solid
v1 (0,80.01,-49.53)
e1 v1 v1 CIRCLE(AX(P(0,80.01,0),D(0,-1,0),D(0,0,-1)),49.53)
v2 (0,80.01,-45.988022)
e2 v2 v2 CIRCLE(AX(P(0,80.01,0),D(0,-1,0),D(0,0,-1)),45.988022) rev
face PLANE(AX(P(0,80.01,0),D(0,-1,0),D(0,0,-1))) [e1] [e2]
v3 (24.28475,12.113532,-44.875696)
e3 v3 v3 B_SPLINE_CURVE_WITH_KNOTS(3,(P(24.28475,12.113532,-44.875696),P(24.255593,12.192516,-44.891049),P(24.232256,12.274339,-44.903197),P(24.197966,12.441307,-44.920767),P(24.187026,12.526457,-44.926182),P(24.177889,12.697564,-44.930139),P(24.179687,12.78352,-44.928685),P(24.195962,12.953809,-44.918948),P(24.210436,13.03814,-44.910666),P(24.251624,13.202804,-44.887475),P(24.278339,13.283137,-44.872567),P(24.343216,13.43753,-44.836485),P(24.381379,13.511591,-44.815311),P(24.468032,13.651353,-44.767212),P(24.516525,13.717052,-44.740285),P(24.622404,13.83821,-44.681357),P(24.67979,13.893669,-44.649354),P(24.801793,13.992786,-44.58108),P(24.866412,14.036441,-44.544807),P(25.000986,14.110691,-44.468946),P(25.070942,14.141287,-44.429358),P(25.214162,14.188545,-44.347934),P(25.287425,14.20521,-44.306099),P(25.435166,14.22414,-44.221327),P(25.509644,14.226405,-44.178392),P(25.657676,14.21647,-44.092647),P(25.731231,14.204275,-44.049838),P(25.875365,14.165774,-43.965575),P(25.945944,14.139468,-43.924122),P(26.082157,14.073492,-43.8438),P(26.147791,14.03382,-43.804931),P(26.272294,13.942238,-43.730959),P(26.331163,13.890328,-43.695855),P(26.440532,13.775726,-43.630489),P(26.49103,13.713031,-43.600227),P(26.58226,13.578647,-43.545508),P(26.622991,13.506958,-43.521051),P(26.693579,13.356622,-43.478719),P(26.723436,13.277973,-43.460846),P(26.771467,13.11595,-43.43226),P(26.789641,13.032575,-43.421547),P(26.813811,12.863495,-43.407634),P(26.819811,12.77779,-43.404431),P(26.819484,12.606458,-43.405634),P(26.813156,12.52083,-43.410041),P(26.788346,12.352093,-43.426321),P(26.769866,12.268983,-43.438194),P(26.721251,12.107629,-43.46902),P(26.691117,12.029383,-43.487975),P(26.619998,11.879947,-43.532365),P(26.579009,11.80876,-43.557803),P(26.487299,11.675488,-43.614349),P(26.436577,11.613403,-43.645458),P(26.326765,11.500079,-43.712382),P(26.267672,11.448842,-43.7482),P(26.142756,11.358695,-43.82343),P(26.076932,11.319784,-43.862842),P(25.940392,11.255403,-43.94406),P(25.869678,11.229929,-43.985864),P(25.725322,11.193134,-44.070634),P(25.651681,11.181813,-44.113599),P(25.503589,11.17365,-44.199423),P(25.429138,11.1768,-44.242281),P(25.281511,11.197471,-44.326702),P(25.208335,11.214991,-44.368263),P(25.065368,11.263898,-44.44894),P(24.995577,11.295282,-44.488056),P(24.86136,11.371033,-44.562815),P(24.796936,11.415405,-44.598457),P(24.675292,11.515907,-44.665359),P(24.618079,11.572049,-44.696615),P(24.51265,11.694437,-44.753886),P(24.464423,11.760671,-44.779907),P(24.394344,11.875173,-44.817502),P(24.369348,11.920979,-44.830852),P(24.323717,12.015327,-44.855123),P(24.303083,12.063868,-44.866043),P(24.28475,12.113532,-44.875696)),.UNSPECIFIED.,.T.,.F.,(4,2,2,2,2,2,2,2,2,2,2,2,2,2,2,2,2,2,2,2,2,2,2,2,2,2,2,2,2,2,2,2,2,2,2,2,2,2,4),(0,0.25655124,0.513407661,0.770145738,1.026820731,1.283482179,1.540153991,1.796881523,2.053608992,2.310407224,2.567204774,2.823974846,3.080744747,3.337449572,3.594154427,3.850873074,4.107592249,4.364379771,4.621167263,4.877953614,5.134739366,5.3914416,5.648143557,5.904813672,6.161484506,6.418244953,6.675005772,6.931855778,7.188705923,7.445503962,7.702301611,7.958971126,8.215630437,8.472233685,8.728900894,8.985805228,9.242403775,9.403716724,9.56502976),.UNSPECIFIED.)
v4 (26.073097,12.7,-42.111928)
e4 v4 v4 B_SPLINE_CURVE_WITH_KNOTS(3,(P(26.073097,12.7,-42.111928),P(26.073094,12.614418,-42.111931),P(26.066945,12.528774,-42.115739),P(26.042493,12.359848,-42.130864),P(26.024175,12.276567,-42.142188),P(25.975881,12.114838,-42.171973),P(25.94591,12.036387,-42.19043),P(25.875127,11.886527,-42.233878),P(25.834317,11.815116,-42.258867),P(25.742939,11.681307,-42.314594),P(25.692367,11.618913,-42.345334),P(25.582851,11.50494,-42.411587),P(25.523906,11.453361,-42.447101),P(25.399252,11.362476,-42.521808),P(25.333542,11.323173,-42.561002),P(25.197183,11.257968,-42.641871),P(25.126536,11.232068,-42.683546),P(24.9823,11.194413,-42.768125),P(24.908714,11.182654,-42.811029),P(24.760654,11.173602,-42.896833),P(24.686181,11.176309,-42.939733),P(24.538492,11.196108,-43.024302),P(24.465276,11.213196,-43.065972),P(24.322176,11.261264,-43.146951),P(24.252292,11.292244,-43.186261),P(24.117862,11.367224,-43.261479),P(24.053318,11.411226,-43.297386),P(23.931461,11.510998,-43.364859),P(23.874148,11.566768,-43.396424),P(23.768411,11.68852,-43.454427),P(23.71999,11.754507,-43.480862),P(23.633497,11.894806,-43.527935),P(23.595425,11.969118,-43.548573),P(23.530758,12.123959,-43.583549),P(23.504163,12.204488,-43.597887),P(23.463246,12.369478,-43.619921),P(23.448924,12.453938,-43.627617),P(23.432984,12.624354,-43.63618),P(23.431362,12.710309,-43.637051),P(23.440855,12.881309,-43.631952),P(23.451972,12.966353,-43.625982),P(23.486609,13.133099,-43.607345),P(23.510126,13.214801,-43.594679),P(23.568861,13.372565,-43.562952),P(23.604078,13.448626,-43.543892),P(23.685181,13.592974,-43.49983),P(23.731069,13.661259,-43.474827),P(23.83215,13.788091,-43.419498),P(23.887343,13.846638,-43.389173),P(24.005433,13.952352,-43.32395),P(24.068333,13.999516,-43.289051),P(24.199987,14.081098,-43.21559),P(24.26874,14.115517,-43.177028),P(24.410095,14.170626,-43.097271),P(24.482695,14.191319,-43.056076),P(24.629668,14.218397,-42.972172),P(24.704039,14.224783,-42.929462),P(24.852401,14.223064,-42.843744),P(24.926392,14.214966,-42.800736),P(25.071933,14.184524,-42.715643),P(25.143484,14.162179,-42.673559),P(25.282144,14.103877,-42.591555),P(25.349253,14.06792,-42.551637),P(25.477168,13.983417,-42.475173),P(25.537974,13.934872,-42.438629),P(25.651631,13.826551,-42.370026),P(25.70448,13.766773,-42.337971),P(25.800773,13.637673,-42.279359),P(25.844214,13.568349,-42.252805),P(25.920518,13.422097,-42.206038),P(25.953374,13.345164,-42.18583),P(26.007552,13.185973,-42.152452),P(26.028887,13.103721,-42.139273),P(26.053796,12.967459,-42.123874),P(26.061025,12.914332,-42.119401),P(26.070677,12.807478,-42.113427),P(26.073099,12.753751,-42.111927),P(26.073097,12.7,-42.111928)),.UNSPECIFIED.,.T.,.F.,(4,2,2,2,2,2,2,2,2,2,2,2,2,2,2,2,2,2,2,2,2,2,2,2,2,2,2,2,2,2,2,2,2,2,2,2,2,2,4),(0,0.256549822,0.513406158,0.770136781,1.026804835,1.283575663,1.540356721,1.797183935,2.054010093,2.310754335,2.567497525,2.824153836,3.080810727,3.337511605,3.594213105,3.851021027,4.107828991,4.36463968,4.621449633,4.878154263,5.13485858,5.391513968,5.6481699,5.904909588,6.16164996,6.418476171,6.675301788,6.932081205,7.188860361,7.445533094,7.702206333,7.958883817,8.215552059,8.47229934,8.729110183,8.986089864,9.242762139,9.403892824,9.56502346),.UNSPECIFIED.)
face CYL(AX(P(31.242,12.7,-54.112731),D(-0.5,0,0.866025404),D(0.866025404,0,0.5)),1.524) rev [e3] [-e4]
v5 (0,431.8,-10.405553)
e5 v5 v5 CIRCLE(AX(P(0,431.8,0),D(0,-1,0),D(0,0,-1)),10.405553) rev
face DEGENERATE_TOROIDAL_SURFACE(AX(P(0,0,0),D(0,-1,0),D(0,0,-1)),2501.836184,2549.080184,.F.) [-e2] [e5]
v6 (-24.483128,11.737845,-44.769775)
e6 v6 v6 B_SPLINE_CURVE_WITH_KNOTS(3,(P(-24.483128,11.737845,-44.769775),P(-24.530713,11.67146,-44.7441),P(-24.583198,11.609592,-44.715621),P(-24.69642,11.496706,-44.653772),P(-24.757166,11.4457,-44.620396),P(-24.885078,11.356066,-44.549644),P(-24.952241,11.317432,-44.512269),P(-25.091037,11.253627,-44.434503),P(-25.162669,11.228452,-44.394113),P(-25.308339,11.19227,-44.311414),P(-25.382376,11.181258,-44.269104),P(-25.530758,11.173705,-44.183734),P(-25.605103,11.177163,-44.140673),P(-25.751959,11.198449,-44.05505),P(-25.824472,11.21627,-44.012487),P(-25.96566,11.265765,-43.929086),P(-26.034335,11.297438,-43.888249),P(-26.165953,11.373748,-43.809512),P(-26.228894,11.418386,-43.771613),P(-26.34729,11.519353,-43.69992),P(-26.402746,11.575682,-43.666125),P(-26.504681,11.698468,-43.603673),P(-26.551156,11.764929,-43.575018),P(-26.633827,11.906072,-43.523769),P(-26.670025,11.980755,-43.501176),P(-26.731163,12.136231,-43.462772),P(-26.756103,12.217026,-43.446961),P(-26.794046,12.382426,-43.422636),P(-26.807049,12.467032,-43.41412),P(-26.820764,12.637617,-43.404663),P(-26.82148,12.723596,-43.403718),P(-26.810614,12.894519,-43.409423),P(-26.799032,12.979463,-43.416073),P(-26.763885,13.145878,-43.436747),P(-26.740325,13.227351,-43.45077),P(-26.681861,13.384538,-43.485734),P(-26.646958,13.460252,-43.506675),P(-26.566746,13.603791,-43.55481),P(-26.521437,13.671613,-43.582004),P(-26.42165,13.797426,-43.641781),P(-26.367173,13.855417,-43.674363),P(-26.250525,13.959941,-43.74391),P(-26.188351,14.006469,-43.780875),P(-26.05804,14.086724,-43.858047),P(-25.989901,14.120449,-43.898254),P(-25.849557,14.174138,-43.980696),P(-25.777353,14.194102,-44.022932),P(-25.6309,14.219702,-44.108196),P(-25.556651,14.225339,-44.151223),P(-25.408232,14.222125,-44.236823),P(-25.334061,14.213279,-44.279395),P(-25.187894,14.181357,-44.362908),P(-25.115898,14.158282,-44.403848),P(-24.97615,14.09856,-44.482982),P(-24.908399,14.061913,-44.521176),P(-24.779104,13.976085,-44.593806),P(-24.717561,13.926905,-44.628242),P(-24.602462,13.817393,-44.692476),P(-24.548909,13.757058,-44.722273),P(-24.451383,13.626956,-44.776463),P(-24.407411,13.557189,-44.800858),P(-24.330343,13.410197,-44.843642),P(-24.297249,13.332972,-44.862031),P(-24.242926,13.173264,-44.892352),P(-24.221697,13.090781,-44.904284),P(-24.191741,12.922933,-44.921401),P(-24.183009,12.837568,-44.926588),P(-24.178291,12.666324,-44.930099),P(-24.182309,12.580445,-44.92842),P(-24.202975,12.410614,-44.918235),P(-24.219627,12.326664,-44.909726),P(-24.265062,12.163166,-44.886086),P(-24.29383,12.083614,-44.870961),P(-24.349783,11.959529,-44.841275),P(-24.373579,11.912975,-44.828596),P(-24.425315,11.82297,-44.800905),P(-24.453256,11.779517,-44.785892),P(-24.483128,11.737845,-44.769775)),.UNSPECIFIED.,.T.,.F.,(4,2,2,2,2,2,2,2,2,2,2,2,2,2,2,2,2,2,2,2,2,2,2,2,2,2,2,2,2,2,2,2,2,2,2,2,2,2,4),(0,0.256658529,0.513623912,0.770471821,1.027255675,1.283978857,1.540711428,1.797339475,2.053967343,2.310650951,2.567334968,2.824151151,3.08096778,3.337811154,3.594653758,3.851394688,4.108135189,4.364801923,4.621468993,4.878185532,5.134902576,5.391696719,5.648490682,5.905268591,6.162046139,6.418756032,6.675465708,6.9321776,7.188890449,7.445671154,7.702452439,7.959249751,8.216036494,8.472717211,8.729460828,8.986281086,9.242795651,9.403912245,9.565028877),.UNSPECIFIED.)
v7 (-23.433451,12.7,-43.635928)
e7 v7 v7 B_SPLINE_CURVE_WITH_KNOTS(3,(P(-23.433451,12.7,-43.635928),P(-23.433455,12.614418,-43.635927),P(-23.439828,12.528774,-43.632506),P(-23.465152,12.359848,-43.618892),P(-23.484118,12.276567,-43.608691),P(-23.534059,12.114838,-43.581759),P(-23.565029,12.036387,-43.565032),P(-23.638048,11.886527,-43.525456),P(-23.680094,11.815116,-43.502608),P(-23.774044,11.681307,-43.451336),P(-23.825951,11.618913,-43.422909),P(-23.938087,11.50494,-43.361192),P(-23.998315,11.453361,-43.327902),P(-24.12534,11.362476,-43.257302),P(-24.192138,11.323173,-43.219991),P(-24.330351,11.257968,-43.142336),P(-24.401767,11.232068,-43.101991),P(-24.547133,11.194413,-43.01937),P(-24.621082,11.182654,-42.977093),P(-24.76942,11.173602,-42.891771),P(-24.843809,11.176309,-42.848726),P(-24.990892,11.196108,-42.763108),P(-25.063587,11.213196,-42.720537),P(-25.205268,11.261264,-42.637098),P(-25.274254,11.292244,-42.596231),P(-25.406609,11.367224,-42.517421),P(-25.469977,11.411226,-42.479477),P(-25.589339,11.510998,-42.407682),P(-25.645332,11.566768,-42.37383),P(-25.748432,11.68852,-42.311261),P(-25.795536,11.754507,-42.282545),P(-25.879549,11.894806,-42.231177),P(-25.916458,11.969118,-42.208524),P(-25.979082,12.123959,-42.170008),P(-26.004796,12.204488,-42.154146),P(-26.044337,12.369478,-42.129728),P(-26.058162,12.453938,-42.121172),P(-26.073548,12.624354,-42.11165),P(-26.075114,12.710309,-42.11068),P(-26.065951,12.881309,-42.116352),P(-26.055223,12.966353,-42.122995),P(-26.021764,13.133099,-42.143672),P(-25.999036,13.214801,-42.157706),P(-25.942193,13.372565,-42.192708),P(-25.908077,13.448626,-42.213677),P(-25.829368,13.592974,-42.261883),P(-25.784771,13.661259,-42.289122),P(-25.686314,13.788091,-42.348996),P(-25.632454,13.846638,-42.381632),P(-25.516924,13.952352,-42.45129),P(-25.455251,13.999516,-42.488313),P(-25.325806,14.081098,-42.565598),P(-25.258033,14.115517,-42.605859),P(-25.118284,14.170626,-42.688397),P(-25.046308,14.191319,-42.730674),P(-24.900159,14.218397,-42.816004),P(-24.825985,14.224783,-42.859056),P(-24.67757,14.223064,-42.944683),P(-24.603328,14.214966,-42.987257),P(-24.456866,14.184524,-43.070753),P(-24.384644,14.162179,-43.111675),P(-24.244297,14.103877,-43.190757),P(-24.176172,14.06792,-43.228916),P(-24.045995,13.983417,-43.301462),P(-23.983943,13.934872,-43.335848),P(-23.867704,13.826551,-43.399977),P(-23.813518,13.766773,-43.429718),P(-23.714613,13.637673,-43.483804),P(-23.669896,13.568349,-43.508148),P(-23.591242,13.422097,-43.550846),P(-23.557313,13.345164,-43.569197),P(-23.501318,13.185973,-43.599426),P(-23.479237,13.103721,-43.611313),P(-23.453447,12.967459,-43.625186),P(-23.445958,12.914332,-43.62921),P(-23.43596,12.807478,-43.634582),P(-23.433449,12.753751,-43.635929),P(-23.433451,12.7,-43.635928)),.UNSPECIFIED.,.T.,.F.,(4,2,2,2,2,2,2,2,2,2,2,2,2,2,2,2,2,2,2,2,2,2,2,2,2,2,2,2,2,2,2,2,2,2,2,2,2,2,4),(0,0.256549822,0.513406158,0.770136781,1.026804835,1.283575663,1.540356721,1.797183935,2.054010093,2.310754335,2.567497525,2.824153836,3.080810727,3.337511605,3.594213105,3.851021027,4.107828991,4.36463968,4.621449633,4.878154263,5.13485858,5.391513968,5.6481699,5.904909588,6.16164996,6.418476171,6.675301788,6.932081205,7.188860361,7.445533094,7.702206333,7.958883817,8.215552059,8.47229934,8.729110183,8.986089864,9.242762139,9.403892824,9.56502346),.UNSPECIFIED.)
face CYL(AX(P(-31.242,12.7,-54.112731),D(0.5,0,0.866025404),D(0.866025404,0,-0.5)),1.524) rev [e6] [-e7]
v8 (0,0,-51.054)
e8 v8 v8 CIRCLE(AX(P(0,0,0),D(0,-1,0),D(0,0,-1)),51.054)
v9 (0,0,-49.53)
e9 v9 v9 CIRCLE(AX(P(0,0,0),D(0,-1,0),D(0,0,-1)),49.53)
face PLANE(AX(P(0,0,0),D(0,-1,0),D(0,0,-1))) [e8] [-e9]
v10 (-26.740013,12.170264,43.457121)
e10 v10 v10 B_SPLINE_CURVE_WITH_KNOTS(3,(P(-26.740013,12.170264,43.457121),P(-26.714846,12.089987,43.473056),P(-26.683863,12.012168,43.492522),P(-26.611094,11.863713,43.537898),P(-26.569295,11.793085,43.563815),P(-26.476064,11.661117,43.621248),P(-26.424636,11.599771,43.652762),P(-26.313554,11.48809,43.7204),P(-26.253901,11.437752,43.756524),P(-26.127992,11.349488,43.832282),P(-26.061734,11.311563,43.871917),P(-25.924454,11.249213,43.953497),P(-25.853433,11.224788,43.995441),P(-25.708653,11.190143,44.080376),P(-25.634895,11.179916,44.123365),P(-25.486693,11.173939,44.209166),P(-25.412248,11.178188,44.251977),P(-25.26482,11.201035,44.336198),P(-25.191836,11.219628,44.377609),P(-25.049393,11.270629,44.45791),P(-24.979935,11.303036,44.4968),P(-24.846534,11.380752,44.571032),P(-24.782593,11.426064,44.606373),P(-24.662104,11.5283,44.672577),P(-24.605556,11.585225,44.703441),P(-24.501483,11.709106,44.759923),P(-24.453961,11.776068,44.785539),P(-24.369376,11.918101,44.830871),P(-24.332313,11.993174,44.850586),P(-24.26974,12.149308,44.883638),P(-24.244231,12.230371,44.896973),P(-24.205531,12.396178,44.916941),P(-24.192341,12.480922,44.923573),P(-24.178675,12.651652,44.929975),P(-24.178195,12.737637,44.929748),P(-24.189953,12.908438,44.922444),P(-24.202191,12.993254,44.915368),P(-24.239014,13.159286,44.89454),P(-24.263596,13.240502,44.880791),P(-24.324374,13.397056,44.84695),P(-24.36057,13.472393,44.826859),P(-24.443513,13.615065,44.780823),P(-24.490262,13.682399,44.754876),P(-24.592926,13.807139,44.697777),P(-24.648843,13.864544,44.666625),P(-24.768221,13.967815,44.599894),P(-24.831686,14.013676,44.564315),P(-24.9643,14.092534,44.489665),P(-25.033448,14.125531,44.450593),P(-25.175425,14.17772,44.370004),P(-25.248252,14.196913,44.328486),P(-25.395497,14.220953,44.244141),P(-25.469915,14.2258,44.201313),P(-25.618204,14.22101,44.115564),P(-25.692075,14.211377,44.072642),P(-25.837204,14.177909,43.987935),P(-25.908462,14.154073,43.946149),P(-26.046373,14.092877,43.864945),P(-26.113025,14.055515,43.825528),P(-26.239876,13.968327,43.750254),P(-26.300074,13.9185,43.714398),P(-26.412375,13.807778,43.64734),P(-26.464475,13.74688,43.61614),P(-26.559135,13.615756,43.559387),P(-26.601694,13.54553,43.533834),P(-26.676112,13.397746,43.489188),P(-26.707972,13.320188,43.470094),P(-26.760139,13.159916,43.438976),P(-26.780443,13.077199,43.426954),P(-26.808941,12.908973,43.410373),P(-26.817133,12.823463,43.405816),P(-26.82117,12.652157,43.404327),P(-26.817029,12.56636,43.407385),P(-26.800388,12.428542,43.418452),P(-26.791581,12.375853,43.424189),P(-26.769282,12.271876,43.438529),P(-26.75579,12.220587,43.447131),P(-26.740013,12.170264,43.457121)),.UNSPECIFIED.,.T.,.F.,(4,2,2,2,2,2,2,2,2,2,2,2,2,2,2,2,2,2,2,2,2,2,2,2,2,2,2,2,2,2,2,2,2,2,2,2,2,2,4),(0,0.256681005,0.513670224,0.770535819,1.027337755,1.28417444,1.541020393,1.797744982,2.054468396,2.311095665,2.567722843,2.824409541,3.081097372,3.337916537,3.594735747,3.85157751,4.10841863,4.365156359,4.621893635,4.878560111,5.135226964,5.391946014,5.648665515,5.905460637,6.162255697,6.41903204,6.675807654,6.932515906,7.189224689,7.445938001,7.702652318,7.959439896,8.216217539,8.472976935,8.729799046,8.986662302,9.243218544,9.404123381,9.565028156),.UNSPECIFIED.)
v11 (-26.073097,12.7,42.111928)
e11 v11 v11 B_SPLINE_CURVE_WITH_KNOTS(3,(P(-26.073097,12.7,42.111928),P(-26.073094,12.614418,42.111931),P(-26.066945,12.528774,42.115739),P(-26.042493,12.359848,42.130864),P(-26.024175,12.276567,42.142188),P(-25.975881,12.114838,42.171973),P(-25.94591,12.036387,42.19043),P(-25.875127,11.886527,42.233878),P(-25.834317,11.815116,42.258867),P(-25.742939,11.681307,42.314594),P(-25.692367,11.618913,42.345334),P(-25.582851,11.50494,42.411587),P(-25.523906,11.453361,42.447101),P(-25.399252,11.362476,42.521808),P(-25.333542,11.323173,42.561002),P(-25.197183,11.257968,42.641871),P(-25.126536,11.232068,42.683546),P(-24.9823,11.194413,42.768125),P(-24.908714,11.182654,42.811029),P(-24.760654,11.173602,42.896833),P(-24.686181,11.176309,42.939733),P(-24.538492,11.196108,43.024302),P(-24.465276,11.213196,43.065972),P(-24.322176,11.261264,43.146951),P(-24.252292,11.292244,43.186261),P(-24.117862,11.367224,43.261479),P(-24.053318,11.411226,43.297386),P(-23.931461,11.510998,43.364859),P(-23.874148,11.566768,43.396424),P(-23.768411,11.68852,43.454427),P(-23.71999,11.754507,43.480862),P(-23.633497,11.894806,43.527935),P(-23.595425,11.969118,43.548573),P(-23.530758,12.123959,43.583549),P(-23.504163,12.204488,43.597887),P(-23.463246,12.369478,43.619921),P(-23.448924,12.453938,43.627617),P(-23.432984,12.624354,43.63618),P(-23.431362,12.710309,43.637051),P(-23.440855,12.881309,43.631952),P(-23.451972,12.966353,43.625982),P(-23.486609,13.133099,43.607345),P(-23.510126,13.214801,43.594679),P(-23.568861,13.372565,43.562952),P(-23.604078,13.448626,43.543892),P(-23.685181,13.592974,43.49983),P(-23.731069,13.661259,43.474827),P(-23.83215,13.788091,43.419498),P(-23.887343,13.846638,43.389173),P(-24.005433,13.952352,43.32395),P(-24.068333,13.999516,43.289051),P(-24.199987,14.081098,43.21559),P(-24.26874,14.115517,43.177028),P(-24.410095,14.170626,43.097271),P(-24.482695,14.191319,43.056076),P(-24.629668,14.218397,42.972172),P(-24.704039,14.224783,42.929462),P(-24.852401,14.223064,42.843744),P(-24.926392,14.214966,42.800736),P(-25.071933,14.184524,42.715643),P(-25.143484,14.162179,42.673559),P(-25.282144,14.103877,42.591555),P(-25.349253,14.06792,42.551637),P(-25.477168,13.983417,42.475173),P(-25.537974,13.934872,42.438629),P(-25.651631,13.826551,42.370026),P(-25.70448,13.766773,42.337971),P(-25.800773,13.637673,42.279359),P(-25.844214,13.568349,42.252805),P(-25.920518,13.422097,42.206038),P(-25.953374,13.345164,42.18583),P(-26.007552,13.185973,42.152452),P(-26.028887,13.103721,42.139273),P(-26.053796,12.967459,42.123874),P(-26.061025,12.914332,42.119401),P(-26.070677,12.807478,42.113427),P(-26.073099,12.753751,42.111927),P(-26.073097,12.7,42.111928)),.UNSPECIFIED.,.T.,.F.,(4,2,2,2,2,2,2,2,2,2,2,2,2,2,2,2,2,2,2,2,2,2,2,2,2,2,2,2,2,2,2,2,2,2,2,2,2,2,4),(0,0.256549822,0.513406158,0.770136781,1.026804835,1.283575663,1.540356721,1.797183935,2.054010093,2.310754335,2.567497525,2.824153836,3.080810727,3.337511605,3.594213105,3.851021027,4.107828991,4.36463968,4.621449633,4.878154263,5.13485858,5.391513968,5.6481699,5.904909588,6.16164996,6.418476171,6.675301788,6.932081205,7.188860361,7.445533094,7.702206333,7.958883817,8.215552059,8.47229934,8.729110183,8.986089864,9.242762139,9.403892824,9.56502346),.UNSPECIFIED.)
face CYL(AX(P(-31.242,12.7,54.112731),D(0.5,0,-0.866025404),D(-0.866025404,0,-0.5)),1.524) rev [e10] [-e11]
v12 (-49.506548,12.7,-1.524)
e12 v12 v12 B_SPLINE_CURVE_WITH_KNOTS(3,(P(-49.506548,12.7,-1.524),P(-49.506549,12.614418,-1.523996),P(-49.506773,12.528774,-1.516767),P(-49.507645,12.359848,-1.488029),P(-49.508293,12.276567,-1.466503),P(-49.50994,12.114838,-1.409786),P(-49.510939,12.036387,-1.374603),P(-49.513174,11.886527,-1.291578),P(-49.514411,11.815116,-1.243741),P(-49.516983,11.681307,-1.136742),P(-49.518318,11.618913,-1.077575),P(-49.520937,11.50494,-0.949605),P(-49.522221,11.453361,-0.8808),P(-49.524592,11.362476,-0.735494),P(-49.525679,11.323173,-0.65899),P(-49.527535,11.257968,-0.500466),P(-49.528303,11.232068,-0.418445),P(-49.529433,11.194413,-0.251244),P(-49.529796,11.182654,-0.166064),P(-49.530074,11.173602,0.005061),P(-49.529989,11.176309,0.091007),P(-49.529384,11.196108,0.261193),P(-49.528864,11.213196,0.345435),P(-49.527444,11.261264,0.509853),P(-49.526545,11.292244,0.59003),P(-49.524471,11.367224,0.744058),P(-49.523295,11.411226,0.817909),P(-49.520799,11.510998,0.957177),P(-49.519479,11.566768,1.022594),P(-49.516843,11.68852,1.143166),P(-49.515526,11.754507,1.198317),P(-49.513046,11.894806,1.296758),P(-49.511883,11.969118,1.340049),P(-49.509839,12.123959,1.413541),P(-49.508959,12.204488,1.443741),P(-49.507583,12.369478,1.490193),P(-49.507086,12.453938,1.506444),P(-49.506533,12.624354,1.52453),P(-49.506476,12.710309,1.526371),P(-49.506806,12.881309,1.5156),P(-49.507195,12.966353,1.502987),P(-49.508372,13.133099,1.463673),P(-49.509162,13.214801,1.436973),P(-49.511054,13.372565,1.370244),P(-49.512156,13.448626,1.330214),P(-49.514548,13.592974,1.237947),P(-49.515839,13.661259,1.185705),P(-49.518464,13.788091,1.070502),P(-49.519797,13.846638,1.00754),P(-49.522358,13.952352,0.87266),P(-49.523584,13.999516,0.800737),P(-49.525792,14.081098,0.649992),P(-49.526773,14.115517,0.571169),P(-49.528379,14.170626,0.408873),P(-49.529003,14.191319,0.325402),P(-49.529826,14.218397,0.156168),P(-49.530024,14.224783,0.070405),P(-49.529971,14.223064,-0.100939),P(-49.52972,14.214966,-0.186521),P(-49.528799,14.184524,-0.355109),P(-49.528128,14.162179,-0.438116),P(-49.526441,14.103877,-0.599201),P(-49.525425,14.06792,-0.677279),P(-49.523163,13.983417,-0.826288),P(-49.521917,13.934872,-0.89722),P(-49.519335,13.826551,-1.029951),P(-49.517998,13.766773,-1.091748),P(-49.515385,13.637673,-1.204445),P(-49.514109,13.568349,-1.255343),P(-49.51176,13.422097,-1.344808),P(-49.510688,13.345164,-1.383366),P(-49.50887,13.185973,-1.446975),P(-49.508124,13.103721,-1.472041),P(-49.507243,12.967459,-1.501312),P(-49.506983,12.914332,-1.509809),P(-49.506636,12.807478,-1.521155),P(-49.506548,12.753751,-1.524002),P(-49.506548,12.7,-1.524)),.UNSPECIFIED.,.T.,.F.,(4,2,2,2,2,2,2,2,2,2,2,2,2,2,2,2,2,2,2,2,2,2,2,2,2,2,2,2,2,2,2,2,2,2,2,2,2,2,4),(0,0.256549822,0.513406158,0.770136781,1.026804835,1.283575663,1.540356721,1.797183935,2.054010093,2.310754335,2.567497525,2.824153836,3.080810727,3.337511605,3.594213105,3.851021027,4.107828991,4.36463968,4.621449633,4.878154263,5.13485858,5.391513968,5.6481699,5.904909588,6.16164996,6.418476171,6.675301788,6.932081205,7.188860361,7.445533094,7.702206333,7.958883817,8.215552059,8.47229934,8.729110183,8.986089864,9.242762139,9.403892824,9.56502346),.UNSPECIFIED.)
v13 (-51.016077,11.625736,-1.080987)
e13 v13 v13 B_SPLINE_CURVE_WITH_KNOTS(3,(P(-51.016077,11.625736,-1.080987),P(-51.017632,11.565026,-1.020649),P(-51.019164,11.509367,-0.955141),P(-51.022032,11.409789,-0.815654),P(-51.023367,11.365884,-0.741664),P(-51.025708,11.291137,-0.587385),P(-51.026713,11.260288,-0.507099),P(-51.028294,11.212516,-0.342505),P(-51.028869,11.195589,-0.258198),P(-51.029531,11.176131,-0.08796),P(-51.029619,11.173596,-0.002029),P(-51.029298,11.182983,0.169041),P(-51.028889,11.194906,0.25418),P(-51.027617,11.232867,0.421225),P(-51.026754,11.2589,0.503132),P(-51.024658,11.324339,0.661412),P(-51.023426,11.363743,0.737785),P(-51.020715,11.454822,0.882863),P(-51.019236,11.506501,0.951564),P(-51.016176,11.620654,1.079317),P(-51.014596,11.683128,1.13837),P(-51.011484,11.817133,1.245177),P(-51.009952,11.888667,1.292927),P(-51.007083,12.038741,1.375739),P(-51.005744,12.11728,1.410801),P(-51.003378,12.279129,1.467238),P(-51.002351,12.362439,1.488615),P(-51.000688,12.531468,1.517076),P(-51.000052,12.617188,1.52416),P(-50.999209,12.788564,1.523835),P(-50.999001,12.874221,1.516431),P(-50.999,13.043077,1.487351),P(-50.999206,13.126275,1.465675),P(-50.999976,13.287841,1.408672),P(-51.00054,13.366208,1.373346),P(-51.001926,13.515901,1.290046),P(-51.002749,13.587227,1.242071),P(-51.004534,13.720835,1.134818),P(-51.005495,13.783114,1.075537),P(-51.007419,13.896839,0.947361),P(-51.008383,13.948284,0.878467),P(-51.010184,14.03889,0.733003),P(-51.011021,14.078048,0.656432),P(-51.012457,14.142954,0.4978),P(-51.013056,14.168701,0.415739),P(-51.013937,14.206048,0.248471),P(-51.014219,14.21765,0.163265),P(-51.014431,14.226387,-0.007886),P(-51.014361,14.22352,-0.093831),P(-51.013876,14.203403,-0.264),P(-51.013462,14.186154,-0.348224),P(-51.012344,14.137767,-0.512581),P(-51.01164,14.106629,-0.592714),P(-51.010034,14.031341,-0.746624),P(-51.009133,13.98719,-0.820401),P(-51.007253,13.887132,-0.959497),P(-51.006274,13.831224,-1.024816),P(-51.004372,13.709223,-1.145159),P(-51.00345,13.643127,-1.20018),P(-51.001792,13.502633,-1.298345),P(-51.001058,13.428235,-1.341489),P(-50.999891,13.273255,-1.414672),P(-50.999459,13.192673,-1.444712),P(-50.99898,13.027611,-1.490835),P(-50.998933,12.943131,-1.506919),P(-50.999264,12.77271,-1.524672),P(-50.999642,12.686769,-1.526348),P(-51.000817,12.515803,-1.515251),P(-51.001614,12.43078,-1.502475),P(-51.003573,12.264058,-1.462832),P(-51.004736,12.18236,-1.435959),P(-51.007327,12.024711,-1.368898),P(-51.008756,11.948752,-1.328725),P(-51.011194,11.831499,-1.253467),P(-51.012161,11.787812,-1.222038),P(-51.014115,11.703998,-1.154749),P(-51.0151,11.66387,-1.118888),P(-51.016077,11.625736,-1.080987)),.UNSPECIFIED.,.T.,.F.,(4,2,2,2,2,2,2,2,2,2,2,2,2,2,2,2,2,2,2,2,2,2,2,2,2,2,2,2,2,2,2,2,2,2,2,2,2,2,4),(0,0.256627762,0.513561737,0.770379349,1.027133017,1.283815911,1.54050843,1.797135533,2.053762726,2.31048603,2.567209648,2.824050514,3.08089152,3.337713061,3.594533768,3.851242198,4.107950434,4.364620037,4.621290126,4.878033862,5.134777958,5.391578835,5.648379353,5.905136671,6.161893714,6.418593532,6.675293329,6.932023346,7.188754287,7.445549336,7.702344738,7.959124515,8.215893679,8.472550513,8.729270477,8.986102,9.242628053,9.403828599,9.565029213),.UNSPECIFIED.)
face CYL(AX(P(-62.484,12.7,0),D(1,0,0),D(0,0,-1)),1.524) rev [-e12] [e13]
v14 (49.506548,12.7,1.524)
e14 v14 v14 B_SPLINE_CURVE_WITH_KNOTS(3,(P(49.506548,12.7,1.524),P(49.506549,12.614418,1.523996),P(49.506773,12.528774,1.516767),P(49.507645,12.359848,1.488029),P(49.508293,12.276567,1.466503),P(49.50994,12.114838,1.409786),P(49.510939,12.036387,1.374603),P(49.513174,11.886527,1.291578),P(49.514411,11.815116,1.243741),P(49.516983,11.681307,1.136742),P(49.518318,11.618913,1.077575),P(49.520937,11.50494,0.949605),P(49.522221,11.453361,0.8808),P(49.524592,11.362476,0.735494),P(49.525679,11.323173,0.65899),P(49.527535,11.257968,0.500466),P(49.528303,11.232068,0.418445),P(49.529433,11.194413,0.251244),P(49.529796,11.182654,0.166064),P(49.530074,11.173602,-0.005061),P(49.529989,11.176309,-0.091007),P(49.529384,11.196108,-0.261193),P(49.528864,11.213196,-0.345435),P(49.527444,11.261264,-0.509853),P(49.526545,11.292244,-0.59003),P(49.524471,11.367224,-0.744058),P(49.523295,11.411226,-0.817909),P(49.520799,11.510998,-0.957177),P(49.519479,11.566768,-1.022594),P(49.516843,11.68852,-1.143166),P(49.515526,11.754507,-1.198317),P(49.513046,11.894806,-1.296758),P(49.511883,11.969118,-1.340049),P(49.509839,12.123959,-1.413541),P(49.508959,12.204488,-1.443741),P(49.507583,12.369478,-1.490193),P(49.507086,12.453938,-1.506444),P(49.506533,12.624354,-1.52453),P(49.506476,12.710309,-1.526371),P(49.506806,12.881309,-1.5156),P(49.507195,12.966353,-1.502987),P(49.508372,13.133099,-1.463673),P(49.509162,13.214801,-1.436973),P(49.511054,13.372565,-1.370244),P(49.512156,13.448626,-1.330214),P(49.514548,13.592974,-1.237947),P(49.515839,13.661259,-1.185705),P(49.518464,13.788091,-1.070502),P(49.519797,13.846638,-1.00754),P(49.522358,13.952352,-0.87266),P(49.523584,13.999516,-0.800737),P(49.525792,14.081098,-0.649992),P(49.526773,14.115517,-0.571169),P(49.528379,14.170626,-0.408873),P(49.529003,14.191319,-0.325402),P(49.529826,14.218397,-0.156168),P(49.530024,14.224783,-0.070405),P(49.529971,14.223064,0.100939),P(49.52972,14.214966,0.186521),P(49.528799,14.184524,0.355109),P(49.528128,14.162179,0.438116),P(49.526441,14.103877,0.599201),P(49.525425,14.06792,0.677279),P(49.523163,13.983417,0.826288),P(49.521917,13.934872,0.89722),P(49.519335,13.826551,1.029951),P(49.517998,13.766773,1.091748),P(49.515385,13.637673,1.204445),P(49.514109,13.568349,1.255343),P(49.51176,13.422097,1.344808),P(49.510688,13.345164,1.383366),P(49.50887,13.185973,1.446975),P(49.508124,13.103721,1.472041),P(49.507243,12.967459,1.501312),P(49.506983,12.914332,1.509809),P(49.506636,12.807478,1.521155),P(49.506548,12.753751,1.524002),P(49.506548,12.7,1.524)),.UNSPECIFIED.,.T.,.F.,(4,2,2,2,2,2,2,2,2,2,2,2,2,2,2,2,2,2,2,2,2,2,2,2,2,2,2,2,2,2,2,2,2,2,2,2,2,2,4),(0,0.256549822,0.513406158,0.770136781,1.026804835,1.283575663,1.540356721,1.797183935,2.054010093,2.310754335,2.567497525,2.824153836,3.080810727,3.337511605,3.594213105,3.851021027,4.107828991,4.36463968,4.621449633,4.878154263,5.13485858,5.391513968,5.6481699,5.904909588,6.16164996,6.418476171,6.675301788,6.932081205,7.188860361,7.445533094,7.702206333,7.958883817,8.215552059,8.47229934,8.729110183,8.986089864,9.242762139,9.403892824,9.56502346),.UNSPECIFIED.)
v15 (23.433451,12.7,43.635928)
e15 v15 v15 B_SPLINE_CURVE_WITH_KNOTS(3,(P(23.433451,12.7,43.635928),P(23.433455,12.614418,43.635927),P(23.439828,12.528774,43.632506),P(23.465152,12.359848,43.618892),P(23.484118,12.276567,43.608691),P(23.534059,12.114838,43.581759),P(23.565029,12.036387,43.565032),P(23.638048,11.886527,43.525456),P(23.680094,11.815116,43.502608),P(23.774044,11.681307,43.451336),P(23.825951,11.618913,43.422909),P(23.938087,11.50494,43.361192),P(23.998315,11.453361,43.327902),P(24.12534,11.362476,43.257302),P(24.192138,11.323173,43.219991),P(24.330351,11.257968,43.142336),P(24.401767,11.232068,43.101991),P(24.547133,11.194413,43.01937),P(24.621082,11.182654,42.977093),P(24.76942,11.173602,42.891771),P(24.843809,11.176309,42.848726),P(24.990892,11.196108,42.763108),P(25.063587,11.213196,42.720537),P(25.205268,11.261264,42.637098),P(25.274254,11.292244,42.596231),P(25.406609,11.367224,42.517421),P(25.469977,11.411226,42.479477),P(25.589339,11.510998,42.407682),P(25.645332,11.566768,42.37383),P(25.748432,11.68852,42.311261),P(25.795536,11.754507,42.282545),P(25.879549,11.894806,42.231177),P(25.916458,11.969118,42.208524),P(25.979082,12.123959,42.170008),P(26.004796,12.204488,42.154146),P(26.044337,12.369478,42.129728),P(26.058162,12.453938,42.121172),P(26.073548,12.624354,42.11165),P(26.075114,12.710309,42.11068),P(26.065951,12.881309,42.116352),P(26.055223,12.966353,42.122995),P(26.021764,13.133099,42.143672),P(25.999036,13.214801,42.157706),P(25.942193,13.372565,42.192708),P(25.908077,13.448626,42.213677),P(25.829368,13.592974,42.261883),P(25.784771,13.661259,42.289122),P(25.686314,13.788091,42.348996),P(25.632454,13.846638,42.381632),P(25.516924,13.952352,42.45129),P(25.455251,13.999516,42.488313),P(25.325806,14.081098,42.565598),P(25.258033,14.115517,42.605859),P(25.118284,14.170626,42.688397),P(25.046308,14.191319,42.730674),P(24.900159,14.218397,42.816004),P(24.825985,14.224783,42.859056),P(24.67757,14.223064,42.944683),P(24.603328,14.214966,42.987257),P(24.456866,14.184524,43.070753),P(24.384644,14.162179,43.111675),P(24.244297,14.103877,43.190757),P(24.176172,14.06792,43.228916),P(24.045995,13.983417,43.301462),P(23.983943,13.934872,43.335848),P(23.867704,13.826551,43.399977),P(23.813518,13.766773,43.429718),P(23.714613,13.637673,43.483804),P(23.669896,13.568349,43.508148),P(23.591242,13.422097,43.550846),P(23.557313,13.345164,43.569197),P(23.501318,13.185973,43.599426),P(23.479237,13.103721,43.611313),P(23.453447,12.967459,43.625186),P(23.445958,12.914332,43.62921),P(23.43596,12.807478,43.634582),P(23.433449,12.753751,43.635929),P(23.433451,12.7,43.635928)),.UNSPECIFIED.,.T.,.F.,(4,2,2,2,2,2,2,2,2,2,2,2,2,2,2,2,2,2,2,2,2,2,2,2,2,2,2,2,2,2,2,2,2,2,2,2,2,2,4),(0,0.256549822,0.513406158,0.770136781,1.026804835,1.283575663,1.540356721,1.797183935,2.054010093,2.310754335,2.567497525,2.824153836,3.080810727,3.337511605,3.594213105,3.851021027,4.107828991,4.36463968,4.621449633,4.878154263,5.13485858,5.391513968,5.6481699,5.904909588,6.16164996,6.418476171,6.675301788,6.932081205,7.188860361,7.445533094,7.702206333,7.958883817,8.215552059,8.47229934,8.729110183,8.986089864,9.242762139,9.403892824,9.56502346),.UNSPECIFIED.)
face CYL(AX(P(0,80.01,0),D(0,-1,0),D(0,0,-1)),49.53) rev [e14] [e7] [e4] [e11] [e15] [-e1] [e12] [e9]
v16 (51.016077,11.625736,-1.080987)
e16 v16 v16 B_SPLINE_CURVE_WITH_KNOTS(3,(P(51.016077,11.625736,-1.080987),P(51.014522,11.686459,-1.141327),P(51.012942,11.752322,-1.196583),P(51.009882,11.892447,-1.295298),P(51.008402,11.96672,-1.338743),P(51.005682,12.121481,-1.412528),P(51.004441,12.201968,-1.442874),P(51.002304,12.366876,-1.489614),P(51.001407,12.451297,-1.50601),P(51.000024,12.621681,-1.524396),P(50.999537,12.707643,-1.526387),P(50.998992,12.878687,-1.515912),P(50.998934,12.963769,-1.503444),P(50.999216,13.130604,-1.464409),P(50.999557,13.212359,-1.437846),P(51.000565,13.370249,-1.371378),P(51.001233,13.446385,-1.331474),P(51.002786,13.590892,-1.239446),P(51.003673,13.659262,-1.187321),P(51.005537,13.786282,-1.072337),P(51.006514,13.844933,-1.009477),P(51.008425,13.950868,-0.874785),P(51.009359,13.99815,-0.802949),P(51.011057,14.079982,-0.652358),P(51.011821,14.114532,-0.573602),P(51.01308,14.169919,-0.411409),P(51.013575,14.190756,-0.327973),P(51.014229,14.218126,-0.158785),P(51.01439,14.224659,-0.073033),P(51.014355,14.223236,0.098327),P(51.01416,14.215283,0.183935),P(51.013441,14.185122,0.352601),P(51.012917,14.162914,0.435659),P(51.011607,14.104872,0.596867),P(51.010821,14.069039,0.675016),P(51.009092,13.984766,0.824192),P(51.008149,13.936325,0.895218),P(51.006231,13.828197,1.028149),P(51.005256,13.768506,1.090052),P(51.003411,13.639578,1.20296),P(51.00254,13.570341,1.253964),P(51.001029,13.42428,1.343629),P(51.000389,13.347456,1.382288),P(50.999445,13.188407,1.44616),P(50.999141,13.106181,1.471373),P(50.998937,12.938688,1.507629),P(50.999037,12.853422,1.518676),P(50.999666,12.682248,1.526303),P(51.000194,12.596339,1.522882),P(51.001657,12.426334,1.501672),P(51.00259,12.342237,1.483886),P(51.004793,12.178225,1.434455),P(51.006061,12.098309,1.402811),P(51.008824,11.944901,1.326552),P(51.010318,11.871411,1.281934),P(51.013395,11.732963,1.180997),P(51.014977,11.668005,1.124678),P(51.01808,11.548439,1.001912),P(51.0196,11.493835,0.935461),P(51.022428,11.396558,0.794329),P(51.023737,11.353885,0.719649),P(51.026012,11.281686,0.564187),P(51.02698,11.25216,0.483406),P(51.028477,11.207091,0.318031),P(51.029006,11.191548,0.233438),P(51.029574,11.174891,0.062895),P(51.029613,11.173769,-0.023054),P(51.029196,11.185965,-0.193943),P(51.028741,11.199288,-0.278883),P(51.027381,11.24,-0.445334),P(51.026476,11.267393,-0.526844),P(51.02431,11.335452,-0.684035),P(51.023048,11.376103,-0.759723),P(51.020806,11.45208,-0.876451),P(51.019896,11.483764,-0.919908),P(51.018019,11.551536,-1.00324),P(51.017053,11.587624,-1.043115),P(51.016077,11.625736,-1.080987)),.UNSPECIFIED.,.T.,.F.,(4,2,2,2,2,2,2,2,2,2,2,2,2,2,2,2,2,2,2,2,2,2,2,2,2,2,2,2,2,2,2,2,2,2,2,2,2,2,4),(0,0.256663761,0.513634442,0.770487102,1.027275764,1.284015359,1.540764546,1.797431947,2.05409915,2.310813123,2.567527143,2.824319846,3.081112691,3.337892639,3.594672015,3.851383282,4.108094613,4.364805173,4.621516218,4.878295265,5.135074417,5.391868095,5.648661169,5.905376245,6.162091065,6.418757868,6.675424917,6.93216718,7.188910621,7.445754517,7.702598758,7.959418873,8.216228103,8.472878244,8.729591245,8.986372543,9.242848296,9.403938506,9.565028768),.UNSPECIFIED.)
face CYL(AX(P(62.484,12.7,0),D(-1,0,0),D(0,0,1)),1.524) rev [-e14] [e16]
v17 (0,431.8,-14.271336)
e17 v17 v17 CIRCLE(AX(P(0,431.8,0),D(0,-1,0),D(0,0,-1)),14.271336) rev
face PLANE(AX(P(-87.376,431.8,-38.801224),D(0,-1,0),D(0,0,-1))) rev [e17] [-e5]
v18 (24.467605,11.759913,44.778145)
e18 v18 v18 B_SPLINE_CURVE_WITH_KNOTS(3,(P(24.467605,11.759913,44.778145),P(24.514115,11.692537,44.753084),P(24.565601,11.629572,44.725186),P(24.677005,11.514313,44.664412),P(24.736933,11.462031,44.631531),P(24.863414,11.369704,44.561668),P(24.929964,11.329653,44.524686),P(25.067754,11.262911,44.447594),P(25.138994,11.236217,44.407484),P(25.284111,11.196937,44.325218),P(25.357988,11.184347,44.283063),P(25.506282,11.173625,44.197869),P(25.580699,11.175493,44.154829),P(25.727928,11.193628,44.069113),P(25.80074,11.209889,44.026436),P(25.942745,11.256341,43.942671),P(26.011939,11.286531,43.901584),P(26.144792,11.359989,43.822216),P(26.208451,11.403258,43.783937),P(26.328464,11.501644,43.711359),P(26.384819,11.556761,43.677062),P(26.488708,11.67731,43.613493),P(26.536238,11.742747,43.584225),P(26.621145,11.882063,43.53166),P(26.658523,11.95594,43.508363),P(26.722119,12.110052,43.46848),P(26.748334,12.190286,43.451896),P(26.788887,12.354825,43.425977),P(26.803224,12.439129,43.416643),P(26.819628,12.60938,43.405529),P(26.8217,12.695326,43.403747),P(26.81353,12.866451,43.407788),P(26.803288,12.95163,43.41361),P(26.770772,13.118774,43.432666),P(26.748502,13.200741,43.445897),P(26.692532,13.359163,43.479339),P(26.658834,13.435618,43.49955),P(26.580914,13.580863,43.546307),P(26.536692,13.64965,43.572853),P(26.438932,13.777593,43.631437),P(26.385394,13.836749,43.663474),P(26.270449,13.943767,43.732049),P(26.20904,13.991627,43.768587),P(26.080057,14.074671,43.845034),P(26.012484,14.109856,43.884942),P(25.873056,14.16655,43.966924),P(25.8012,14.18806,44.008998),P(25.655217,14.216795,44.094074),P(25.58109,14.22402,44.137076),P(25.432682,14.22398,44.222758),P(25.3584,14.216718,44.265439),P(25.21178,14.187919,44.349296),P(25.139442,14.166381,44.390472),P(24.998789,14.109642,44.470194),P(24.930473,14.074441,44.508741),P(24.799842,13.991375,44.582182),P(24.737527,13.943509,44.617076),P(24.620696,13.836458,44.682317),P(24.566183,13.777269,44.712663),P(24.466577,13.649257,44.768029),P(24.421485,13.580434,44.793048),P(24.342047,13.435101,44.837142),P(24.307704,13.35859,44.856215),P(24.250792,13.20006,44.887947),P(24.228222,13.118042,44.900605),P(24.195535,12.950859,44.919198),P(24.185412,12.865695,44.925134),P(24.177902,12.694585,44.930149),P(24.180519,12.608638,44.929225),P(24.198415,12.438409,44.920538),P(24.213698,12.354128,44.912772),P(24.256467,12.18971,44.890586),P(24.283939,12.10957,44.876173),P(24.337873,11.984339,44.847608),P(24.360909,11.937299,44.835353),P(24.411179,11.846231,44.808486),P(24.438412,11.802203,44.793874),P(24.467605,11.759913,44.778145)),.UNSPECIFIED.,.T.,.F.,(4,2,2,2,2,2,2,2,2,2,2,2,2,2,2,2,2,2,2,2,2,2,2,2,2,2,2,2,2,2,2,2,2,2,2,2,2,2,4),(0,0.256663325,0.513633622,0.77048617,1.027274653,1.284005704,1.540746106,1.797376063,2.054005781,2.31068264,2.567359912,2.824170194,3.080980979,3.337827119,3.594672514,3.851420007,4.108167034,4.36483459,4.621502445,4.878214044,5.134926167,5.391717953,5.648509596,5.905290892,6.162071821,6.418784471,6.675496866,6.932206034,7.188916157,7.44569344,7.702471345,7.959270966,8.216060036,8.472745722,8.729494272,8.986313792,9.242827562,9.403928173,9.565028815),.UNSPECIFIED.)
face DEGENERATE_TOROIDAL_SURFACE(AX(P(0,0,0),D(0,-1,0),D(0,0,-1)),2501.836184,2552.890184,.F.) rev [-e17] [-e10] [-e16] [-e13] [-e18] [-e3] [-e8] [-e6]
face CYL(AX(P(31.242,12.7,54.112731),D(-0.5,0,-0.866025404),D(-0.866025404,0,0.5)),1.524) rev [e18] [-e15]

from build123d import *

# Parameters (mm, degrees)
SKETCH4_W          = 83.533222379
SKETCH4_H          = 117.210352631
CUT_EXTRUDE2_DEPTH = 87.376
SKETCH5_R          = 49.53
CUT_EXTRUDE5_DEPTH = 80.01
SKETCH6_R          = 1.524
CUT_EXTRUDE6_DEPTH = 62.484
CIRPATTERN1_COUNT  = 6


# Read off the part's stored shape, not the designer's step: Shell2
with BuildPart() as part:
    # Sketch2 → Revolve1 (revolve)
    with BuildSketch(Plane.XY):
        with BuildLine():
            ThreePointArc((-51.054, 0), (-38.258433103, 255.279509027), (0, 508))
            Line((0, 508), (0, 0))
            Line((0, 0), (-51.054, 0))
        make_face()
    revolve(axis=Axis((0, 0, 0), (0, 1, 0)))

    # Shell2 outline → Shell2 (revolve, cut)
    with BuildSketch(Plane.XY):
        with BuildLine():
            add(Edge.make_bspline(
                [(0, 488.493083776), (47.244, 246.531114188), (47.244, 0)],
                knots=[6.090357515, 6.090357515, 6.090357515, 6.283185307, 6.283185307, 6.283185307], degree=2, weights=[1, 0.99535578, 1]))
            Line((0, 488.493083776), (0, 0))
            Line((0, 0), (47.244, 0))
        make_face()
    revolve(axis=Axis((0, 0, 0), (0, 1, 0)), mode=Mode.SUBTRACT)

    # Sketch4 → Cut-Extrude2 (cut, symmetric)
    with BuildSketch(Plane(origin=(0, 0, 0), x_dir=(0, 0, -1), z_dir=(1, 0, 0))):
        with Locations((-2.96538755, 490.405176316)):
            Rectangle(SKETCH4_W, SKETCH4_H)
    extrude(amount=CUT_EXTRUDE2_DEPTH, both=True, mode=Mode.SUBTRACT)

    # Sketch5 → Cut-Extrude5 (cut)
    with BuildSketch(Plane.XZ):
        with Locations(Location((0, 0, 0), (0, 0, 270))):
            Circle(SKETCH5_R)
    extrude(amount=-CUT_EXTRUDE5_DEPTH, mode=Mode.SUBTRACT)

    # Sketch6 → Cut-Extrude6 (cut)
    with BuildSketch(Plane(origin=(0, 0, 0), x_dir=(0, 0, -1), z_dir=(1, 0, 0))):
        with Locations((0, 12.7)):
            Circle(SKETCH6_R)
    cut_extrude6 = extrude(amount=-CUT_EXTRUDE6_DEPTH, mode=Mode.SUBTRACT)

    # CirPattern1: Cut-Extrude6 ×6 about axis
    cirpattern1_axis = Axis((0, 80.01, 0), (0, -1, 0))
    for i in range(1, CIRPATTERN1_COUNT):
        add(cut_extrude6.rotate(cirpattern1_axis, i * 360 / CIRPATTERN1_COUNT), mode=Mode.SUBTRACT)


solid = part.part
